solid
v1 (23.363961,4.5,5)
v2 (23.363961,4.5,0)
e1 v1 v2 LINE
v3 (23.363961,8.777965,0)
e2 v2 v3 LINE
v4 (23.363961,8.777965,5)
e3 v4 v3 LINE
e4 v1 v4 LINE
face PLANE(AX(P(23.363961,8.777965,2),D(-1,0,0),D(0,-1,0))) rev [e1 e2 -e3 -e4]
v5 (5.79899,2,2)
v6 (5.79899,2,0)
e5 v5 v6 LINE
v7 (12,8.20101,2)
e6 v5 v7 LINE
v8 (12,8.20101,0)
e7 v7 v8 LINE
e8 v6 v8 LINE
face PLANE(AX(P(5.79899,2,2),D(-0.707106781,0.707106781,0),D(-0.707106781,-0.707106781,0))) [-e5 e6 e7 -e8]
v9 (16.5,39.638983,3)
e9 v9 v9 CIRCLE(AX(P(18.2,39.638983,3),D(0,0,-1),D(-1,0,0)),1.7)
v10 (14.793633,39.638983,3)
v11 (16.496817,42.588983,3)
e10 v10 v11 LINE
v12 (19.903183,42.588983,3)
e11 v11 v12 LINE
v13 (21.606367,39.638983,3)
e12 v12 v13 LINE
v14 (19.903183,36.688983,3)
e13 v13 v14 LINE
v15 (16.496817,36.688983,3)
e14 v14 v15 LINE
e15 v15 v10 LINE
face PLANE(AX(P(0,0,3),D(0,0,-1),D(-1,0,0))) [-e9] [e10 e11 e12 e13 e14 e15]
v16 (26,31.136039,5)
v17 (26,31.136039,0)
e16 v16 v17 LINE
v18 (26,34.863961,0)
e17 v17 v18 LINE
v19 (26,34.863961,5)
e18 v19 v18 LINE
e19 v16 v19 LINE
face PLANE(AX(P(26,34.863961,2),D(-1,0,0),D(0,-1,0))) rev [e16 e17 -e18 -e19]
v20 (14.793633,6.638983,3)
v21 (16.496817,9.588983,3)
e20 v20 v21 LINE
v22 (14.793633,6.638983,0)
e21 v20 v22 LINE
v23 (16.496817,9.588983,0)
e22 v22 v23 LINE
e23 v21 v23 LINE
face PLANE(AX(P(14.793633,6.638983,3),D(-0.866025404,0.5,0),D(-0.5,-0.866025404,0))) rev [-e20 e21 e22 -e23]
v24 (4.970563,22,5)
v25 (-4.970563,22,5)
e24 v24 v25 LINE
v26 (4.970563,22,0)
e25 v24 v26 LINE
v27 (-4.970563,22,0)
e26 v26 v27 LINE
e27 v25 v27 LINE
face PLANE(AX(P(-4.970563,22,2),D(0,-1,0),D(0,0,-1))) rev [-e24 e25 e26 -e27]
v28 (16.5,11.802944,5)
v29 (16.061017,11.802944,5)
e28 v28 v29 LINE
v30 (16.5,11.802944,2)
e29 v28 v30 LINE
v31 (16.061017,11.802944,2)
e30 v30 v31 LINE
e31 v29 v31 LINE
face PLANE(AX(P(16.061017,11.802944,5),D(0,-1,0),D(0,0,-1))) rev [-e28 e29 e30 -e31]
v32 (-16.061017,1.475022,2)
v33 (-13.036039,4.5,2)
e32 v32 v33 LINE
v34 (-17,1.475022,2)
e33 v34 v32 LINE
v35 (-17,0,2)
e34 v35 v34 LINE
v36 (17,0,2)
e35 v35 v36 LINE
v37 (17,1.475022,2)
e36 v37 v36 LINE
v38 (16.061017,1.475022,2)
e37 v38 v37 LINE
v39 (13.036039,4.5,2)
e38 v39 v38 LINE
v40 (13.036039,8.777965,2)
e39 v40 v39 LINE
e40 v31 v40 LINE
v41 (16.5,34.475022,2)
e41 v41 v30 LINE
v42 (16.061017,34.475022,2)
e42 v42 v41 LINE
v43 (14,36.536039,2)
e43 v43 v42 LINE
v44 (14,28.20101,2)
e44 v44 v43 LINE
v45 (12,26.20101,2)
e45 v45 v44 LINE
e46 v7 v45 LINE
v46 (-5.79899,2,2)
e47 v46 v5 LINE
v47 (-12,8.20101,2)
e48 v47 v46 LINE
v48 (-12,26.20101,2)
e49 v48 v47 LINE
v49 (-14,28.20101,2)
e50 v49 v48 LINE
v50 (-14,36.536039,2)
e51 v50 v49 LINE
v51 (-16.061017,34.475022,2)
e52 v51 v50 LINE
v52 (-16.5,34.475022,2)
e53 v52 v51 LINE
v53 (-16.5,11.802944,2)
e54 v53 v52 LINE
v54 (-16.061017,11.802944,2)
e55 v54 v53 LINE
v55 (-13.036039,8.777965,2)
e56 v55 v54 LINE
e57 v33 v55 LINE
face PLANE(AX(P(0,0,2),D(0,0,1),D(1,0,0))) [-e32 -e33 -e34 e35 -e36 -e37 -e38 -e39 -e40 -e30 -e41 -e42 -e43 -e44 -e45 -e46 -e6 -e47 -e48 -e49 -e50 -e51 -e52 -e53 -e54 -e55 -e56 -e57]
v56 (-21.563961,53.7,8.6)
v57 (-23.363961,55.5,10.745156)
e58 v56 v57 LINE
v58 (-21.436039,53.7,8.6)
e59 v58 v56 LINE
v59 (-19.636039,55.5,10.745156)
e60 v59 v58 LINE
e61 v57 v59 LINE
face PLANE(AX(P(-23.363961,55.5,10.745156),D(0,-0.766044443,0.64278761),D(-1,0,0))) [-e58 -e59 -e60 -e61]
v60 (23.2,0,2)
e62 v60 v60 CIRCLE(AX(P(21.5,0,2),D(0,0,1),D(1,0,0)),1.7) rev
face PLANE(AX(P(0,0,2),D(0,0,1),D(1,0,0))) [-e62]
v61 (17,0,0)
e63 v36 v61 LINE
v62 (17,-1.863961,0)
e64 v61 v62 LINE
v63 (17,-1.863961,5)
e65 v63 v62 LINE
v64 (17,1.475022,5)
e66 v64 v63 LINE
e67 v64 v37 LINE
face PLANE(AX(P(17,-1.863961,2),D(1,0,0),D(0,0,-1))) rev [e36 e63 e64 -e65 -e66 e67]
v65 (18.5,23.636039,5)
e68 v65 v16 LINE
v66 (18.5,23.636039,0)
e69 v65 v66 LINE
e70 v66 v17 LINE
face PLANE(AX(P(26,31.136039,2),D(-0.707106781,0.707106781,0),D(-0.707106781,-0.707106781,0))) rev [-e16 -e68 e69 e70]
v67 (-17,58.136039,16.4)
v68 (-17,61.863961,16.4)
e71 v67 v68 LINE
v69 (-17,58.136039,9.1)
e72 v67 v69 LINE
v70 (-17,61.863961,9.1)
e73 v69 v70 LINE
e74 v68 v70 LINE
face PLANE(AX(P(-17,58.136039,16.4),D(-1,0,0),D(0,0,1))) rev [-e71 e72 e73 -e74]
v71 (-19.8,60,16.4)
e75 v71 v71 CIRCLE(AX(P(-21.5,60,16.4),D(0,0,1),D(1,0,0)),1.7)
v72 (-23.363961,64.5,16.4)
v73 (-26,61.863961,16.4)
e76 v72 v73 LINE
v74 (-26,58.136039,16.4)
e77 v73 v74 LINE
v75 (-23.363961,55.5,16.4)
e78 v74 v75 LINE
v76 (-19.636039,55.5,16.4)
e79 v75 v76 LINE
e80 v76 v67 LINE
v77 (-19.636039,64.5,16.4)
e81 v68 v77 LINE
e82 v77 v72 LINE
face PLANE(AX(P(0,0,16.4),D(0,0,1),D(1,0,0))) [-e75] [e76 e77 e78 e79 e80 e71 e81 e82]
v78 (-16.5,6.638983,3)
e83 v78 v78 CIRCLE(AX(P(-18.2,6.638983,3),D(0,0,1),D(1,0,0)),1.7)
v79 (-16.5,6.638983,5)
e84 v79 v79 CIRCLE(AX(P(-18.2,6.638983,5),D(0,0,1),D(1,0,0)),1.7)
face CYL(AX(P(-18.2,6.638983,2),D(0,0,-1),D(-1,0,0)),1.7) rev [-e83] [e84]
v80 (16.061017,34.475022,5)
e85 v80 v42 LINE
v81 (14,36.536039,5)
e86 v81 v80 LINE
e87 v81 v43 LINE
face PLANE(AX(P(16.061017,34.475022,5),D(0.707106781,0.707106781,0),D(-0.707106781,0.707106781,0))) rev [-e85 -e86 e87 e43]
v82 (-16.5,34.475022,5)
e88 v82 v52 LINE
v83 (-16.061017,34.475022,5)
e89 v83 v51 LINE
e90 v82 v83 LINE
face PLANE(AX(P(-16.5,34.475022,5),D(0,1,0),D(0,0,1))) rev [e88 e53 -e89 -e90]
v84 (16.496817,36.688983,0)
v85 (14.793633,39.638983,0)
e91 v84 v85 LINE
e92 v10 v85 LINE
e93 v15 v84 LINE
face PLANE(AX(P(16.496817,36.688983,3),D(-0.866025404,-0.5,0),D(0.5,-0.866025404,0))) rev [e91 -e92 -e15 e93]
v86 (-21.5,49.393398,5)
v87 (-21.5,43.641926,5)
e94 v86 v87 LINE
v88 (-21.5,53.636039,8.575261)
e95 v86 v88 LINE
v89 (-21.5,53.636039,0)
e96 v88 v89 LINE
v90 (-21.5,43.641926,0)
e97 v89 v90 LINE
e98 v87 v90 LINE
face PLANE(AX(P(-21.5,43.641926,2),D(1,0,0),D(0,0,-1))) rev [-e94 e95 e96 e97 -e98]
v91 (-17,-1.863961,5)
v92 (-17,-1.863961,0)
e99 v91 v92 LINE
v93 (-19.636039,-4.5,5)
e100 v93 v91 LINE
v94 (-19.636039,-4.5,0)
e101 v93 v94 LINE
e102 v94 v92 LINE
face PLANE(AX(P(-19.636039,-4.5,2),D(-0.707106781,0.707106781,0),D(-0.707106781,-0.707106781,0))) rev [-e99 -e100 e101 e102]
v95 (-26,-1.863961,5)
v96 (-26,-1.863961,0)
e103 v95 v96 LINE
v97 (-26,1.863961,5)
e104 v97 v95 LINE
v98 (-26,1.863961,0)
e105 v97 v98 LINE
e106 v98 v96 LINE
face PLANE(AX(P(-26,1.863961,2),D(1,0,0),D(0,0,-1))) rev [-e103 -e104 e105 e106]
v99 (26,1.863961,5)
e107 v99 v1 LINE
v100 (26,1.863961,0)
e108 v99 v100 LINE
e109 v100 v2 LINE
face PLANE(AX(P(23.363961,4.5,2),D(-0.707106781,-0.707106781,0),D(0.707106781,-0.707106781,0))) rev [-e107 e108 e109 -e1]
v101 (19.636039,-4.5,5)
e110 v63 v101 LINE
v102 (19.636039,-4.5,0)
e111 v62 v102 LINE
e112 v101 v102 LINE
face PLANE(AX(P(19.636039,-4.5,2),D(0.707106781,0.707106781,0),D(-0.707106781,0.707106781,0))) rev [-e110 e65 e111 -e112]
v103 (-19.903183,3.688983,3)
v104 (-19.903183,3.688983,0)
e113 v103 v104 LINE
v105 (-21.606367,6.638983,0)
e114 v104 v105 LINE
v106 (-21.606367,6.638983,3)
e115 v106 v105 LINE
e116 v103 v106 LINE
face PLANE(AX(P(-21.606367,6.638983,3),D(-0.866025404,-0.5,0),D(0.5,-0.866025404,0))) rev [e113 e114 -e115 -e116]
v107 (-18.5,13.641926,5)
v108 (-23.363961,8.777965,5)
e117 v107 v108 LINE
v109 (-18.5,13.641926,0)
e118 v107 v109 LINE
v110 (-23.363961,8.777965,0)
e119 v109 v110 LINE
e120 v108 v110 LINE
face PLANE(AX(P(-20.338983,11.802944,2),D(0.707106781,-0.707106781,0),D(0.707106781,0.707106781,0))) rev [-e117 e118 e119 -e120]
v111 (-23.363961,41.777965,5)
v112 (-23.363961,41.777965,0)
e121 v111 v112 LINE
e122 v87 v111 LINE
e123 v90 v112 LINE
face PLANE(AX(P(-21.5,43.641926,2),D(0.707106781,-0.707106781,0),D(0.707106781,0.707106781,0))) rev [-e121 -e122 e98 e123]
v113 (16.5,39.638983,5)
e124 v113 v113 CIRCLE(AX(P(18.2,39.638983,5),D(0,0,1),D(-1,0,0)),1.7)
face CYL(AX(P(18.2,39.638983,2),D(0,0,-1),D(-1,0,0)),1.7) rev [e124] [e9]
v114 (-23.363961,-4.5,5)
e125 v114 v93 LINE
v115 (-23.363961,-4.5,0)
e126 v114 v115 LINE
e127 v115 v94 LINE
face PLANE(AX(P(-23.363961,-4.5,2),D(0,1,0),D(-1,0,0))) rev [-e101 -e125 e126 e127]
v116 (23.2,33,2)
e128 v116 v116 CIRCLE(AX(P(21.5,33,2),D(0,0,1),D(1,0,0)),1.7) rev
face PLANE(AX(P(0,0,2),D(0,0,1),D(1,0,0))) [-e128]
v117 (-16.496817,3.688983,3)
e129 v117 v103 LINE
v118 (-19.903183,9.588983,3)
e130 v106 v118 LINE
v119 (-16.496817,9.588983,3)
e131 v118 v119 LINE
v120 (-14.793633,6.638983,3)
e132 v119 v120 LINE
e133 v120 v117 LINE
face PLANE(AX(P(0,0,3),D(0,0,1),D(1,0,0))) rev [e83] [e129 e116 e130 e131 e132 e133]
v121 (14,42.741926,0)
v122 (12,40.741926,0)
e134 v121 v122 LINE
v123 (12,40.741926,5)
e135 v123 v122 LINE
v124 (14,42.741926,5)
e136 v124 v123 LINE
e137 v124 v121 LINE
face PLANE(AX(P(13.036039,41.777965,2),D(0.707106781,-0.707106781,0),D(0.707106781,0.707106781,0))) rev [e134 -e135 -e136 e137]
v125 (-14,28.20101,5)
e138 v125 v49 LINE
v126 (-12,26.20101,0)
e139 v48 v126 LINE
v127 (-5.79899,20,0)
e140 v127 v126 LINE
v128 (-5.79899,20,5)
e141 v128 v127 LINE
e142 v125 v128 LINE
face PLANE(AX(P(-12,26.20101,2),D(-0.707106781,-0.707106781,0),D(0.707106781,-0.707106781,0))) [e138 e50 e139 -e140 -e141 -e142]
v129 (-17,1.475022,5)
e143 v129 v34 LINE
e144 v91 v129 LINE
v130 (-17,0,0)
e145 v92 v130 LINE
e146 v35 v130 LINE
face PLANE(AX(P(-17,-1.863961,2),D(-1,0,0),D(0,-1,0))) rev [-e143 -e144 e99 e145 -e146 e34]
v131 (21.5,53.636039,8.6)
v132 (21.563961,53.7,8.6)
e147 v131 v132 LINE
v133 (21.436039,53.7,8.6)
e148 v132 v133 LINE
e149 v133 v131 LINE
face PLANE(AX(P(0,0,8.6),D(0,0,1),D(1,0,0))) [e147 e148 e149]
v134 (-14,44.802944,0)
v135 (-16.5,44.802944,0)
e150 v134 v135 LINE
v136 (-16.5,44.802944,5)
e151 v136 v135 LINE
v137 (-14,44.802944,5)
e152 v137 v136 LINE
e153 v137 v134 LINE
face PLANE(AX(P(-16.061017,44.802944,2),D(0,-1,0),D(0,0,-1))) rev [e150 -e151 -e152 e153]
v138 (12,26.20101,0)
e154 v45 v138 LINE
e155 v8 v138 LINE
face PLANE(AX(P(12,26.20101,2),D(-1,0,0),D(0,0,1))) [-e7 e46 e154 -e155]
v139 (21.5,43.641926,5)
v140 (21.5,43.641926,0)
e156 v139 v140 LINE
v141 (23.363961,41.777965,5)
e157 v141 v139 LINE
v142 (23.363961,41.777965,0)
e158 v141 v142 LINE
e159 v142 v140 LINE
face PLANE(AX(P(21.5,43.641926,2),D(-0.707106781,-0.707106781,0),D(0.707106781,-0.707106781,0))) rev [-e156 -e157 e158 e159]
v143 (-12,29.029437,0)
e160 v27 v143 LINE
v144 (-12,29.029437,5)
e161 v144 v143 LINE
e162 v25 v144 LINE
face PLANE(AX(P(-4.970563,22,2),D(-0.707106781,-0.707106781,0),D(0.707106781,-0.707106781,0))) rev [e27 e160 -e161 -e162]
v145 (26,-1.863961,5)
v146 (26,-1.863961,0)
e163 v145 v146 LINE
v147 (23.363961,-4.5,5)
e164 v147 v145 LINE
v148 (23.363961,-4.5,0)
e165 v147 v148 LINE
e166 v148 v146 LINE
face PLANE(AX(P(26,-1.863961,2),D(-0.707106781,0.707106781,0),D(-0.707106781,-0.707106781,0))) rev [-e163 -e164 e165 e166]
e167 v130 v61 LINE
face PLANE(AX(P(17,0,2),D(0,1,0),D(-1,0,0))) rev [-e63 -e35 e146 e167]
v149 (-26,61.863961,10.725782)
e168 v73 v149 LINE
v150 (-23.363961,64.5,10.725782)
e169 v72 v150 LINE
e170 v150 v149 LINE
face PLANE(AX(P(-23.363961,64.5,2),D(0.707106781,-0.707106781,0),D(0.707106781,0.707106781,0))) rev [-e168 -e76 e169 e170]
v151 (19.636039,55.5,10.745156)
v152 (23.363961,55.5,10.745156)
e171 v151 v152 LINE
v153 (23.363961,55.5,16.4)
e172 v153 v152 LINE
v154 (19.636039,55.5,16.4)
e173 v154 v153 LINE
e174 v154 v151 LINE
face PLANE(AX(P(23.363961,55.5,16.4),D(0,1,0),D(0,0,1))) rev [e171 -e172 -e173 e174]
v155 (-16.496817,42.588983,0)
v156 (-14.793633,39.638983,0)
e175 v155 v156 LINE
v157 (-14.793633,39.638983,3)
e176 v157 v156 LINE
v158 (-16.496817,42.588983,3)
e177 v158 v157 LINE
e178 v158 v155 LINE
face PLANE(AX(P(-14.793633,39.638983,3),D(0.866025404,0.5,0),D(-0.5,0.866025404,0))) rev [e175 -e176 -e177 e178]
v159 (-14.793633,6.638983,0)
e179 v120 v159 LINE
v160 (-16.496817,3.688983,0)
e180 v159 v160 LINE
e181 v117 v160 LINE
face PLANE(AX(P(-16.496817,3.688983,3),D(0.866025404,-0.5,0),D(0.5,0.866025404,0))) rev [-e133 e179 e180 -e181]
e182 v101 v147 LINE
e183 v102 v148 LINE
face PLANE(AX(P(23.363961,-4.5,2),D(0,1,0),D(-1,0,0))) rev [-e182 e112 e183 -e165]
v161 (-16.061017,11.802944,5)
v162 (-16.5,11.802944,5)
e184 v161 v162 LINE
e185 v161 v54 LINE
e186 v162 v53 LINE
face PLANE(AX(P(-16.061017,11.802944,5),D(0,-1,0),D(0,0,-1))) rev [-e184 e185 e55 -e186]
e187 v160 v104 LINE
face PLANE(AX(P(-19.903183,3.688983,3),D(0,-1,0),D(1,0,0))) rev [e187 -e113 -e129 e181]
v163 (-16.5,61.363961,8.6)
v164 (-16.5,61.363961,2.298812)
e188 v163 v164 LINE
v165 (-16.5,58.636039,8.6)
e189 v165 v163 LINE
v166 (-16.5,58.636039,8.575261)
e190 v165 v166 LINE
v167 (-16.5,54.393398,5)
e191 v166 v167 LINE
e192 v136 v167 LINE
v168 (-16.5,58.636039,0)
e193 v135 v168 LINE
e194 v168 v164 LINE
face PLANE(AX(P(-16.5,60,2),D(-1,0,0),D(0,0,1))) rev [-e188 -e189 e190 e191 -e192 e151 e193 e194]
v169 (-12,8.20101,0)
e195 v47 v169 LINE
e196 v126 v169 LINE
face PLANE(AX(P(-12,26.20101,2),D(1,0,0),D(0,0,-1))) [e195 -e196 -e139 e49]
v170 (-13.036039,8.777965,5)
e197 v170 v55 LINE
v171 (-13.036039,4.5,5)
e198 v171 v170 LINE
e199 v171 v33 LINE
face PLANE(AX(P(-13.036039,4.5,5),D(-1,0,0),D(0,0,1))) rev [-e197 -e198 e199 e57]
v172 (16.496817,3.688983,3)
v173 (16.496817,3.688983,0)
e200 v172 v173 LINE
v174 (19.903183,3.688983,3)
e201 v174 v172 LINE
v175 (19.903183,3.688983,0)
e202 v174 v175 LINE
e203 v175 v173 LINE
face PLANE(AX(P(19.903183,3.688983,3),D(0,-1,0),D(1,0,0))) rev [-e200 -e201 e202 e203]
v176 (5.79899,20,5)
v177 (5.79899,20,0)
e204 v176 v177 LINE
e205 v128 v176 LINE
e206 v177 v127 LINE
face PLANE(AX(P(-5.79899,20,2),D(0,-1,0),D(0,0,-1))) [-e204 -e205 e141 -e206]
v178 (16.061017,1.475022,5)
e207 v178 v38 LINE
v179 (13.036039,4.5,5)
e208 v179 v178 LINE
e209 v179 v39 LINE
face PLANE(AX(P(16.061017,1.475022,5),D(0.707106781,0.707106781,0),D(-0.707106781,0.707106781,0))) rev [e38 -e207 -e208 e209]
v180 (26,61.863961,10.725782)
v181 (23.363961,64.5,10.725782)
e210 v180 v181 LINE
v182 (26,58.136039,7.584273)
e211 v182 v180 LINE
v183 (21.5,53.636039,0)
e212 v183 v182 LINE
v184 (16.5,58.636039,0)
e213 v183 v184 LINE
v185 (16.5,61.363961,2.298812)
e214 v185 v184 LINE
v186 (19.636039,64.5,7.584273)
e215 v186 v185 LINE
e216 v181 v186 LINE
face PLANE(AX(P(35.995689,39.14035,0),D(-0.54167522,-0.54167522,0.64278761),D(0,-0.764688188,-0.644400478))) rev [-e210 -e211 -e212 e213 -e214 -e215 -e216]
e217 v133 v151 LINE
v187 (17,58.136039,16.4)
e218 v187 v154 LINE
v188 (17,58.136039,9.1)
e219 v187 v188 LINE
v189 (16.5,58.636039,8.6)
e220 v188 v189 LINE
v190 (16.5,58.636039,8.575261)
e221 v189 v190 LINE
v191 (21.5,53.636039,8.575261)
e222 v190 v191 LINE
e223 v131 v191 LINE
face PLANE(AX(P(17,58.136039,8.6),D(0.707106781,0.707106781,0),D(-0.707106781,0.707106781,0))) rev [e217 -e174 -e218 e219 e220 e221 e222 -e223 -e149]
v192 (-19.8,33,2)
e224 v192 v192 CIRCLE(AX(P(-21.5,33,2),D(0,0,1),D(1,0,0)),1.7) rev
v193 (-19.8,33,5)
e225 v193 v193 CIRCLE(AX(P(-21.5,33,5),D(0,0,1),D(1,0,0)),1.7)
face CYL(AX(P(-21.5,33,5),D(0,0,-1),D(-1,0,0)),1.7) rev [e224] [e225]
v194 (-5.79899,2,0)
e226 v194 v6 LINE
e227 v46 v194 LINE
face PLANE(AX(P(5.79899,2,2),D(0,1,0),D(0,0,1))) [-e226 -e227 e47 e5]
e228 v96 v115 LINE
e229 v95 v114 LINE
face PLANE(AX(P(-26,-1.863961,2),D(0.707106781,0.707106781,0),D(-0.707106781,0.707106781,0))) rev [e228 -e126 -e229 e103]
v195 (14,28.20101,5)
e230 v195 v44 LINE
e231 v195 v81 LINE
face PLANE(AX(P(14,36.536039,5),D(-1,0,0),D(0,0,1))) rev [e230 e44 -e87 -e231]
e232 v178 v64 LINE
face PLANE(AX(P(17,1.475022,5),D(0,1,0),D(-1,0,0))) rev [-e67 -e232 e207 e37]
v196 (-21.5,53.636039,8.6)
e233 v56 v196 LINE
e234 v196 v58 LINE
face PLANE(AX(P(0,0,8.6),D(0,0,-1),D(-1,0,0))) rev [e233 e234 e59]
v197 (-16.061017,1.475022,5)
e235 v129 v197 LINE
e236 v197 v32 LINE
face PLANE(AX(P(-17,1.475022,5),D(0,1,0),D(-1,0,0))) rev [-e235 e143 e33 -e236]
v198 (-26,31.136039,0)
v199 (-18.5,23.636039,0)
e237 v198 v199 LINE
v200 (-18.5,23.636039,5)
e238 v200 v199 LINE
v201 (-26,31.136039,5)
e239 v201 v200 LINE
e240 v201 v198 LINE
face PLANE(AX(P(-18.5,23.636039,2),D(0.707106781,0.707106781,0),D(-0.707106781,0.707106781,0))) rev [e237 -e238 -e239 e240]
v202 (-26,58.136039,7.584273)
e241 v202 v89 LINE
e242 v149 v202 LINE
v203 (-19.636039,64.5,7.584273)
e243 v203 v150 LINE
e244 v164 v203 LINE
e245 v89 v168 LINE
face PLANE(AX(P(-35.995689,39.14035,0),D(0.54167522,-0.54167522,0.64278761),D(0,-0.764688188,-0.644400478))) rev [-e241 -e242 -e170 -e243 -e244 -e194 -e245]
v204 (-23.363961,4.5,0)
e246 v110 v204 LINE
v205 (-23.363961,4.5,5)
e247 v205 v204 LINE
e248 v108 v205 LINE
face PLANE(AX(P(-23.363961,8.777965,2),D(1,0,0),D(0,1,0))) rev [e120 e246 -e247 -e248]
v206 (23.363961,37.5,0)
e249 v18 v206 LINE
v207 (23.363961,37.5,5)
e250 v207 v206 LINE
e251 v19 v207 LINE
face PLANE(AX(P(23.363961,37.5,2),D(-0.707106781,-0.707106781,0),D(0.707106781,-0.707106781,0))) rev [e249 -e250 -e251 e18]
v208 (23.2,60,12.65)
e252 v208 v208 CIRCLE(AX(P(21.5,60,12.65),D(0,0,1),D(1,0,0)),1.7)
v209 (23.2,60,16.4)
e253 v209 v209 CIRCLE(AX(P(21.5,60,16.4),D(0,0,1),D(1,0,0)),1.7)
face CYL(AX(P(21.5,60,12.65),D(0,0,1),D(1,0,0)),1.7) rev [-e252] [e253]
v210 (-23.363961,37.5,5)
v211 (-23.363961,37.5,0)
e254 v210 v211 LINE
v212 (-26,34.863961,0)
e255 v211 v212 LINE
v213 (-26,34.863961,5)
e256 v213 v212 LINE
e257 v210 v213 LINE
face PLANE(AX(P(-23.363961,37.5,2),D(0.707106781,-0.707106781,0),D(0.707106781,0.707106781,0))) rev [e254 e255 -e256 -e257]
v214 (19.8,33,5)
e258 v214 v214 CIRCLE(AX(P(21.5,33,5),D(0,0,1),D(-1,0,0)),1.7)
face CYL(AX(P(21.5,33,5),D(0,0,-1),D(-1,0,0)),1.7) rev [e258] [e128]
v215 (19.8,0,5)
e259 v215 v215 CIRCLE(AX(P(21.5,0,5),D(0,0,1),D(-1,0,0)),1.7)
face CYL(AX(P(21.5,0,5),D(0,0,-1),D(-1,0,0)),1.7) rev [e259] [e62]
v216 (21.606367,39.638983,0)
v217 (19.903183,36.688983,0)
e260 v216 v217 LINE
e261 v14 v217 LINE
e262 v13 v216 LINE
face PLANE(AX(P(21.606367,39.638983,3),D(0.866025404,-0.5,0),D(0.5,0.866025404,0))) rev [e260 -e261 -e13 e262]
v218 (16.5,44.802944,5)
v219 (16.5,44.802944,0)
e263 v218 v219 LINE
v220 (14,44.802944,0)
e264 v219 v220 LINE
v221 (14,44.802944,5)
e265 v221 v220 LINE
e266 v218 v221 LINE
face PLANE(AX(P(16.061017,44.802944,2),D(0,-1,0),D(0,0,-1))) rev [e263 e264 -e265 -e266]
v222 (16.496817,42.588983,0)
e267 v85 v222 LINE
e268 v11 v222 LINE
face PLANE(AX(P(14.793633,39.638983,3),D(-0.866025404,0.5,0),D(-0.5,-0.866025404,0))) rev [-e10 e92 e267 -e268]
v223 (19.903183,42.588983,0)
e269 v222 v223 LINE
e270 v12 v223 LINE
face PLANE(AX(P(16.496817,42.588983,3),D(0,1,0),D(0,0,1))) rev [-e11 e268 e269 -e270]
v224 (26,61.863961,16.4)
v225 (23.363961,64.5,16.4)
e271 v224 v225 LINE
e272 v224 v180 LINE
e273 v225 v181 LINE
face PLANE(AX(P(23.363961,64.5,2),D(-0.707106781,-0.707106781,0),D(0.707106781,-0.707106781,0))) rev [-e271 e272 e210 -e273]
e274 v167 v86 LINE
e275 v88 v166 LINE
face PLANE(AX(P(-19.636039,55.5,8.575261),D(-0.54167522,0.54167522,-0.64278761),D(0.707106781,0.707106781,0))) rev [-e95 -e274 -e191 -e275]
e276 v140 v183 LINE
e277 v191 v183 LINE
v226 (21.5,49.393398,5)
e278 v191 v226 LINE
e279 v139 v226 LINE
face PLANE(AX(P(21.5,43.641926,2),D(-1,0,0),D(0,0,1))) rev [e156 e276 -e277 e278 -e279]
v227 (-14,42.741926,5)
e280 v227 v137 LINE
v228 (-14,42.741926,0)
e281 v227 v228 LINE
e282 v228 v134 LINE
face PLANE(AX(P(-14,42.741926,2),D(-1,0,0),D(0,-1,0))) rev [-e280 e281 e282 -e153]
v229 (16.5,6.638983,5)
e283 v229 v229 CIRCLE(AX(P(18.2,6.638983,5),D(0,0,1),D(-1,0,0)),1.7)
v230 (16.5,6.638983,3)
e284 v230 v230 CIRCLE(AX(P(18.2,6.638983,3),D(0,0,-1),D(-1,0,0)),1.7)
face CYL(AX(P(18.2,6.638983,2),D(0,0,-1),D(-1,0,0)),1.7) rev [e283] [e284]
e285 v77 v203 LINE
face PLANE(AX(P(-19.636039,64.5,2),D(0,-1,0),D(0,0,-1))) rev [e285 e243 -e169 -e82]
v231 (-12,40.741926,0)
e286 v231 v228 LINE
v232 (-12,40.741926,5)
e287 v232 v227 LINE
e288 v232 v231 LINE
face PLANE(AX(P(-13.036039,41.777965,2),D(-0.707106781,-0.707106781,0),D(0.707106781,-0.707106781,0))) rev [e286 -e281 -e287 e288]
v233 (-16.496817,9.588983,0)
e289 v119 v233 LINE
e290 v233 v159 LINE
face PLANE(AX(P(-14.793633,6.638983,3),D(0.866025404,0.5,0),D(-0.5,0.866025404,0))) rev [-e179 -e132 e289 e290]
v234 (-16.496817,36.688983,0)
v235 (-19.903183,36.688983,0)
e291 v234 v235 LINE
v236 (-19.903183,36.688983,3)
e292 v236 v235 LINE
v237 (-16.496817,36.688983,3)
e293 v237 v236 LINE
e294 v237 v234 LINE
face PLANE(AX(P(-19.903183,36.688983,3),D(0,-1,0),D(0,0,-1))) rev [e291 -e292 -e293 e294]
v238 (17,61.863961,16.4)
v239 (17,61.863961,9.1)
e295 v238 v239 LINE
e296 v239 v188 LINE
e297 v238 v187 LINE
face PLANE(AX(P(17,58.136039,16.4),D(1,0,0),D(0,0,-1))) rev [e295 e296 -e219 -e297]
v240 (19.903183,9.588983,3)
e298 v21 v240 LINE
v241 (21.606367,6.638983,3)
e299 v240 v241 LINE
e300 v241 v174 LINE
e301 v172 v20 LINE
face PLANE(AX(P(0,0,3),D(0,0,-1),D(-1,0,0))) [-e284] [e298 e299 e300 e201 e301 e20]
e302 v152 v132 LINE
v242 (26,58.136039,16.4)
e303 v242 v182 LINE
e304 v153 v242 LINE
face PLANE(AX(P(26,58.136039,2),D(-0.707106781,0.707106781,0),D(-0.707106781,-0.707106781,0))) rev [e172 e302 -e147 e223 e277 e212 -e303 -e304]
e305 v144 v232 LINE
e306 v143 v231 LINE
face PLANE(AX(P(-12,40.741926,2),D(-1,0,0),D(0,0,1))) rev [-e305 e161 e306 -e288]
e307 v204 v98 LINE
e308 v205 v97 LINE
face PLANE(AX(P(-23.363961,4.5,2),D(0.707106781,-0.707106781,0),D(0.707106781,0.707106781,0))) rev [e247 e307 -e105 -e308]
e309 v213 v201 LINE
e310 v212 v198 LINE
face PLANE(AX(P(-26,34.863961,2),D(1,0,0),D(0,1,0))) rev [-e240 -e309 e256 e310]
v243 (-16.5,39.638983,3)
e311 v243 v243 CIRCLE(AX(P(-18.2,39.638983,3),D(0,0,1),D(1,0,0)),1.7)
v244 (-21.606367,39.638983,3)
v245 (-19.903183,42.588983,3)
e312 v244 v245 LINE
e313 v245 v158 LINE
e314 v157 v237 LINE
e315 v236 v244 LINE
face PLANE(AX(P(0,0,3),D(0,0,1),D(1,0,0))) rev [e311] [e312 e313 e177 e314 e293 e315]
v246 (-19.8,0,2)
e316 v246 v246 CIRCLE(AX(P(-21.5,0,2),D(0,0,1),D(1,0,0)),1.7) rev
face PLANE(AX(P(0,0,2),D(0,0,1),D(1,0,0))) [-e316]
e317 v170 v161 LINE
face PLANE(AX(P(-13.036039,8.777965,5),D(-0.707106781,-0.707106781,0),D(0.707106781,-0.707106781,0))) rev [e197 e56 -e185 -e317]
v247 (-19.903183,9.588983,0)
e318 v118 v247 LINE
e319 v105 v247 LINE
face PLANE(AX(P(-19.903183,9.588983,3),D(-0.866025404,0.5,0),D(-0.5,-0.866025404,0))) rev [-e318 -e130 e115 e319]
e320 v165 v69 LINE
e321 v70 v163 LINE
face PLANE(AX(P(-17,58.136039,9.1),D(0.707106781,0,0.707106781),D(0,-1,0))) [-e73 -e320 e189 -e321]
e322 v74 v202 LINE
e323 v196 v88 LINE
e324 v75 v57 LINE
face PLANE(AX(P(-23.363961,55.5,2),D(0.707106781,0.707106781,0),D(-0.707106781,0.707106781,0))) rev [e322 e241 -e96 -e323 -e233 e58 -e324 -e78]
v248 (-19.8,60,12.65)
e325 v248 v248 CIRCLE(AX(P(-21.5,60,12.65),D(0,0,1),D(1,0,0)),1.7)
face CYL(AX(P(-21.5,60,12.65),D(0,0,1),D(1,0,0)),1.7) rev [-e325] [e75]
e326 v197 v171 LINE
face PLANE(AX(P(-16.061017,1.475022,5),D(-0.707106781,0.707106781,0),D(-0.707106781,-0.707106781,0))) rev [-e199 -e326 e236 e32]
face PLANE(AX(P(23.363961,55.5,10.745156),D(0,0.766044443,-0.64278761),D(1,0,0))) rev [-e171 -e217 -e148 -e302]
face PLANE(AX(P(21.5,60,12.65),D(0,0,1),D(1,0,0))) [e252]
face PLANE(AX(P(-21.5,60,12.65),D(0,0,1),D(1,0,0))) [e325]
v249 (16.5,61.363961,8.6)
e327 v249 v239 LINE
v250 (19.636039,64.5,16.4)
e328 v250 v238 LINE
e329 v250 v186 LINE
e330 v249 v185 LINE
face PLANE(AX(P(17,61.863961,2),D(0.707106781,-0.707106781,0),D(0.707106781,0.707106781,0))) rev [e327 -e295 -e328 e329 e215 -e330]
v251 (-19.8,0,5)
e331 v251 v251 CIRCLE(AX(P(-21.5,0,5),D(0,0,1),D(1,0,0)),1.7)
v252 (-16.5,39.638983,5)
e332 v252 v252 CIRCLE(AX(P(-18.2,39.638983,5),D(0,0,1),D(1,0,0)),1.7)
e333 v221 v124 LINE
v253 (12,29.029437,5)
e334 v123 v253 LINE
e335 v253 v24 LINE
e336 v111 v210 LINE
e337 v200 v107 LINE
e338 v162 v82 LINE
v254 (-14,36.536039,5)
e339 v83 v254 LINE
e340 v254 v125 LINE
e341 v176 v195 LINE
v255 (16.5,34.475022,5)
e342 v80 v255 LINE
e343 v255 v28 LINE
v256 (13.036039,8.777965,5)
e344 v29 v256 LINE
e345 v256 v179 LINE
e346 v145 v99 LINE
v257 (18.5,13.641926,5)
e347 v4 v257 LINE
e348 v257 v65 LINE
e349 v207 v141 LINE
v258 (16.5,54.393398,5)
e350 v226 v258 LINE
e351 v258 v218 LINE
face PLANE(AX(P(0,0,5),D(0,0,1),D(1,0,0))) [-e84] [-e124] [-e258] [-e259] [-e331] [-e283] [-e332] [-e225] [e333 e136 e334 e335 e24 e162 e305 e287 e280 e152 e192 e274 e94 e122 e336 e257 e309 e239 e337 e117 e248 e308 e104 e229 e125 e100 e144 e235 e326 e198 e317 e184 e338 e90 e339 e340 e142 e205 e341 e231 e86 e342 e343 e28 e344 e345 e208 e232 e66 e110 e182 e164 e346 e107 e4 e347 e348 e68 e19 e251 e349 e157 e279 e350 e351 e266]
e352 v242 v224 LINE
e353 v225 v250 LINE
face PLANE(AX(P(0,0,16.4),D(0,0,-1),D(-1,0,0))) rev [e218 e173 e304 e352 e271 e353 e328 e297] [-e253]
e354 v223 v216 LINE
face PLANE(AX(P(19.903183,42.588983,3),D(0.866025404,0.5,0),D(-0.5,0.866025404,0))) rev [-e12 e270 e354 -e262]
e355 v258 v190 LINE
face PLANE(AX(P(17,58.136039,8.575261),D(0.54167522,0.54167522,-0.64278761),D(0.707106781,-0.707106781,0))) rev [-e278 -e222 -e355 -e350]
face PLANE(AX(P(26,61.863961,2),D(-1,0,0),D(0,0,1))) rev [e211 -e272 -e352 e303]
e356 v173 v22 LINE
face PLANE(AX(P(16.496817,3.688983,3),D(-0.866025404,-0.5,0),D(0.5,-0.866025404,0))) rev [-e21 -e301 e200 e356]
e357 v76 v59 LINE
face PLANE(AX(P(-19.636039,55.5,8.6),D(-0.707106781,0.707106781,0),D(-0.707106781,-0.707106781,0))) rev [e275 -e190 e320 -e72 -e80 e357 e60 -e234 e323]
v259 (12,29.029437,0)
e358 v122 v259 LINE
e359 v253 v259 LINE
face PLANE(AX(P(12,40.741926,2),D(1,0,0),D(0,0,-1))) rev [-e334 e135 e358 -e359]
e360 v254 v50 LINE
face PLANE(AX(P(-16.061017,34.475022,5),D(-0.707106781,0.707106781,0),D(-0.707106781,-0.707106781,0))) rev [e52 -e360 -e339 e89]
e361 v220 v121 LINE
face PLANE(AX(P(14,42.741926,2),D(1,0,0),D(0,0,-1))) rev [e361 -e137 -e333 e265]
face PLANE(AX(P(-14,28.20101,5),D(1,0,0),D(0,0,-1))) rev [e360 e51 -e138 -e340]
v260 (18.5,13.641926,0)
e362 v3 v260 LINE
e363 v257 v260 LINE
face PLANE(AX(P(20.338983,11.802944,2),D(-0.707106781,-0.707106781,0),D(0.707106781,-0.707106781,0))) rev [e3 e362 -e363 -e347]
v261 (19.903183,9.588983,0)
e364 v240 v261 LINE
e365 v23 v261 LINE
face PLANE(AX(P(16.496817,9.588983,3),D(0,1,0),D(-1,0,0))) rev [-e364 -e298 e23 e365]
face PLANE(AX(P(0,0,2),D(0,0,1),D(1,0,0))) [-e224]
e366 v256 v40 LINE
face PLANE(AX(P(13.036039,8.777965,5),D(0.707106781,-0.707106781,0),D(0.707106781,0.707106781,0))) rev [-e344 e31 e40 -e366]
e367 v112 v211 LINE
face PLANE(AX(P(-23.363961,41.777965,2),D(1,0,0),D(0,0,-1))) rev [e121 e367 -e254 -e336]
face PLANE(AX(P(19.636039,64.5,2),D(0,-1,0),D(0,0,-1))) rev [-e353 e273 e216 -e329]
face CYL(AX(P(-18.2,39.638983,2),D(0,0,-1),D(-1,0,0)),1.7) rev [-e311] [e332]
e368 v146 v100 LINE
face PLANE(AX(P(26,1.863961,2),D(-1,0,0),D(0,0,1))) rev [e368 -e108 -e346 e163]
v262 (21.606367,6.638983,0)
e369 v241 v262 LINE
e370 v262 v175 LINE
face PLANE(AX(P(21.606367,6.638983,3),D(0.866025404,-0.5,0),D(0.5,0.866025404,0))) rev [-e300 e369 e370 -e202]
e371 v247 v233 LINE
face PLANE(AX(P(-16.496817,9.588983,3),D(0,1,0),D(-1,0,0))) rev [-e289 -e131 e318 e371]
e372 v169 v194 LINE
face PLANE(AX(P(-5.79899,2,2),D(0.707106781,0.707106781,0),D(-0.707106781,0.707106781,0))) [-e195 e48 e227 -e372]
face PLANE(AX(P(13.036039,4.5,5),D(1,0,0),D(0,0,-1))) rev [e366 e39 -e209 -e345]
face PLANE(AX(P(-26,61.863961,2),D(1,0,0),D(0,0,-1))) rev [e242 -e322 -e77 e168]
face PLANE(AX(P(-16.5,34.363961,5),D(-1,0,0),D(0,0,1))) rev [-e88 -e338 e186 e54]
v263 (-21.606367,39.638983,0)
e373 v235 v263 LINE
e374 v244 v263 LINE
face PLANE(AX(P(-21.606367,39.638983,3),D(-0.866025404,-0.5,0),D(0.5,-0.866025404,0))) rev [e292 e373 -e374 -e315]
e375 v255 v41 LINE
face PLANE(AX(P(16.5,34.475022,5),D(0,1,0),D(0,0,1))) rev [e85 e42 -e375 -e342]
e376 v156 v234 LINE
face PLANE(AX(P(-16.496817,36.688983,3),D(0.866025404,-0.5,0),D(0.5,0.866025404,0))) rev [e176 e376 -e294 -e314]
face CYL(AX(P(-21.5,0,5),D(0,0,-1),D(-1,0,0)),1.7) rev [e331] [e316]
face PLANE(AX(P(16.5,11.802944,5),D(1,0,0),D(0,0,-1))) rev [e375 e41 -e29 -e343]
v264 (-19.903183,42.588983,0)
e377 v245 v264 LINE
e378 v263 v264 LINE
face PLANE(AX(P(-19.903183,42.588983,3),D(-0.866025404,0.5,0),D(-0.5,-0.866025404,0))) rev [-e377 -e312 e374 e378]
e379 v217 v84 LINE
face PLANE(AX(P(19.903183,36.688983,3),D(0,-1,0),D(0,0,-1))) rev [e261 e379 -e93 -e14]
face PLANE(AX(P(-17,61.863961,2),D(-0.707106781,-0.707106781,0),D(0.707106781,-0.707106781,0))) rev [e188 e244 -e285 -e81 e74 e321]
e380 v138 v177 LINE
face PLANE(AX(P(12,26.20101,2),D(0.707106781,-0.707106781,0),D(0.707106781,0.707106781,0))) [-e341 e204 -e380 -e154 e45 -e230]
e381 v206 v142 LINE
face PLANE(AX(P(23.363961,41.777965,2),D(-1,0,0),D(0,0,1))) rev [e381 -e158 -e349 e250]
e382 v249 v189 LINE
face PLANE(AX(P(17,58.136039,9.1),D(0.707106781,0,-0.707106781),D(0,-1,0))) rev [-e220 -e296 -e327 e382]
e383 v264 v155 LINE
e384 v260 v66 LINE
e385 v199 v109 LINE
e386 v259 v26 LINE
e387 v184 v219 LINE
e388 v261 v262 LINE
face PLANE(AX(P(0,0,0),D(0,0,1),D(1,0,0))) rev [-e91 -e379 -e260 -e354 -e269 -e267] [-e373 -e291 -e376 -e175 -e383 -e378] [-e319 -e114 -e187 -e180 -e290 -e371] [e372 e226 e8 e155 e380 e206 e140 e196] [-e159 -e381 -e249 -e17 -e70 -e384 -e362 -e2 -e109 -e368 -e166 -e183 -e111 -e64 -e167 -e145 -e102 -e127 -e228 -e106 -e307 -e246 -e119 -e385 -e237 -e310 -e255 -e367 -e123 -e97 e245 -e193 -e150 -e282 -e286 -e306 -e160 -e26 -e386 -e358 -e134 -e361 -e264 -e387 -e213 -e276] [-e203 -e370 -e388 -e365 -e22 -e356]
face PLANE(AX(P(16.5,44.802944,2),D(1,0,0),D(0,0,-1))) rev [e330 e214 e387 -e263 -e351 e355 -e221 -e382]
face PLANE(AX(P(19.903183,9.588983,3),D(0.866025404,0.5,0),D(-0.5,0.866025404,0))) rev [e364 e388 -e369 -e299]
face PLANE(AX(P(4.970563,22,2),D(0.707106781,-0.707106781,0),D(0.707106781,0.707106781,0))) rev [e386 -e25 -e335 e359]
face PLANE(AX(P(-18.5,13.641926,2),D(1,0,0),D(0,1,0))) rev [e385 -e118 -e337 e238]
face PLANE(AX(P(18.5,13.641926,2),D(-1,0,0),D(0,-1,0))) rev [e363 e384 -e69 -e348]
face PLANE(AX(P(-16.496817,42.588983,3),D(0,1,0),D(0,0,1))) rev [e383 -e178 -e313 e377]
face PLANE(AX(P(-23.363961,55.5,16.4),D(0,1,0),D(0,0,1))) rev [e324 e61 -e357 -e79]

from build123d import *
from OCP.BRepFilletAPI import BRepFilletAPI_MakeChamfer

# Parameters (mm, degrees)
SKETCH5_R           = 1.7
BOSS_EXTRUDE1_DEPTH = 2
SKETCH9_R           = 1.7
BOSS_EXTRUDE3_DEPTH = 3
BOSS_EXTRUDE4_DEPTH = 3.6
BOSS_EXTRUDE5_DEPTH = 7.8
TOP_ANGLE_1_DEPTH   = 25
TOP_ANGLE_2_DEPTH   = 25
CHAMFER1_SIZE       = 3
CHAMFER1_SIZE_2     = 3.575260778
CHAMFER2_SIZE       = 1.8
CHAMFER2_SIZE2      = 2.145156467
SKETCH19_R          = 1.7
CUT_EXTRUDE1_DEPTH  = 3.75
M3_HEAD_HOLES_DEPTH = 3
CHAMFER3_SIZE       = 0.5


# Some blends are built 0.0001 mm under size
with BuildPart() as part:
    # Sketch5 → Boss-Extrude1 (new body)
    with BuildSketch(Plane.XY):
        Polygon((16.5, 44.802943725), (16.5, 45.24192642), (16.5, 61.363961031), (17, 61.863961031), (19.636038969, 64.5), (23.363961031, 64.5), (26, 61.863961031), (26, 58.136038969), (23.363961031, 55.5), (21.5, 53.636038969), (21.5, 43.64192642), (23.363961031, 41.777965389), (23.363961031, 37.5), (26, 34.863961031), (26, 31.136038969), (23.363961031, 28.5), (18.5, 23.636038969), (18.5, 13.64192642), (20.338982694, 11.802943725), (23.363961031, 8.777965389), (23.363961031, 4.5), (26, 1.863961031), (26, -1.863961031), (23.363961031, -4.5), (19.636038969, -4.5), (17, -1.863961031), (17, 0), (-17, 0), (-17, -1.863961031), (-19.636038969, -4.5), (-23.363961031, -4.5), (-26, -1.863961031), (-26, 1.863961031), (-23.363961031, 4.5), (-23.363961031, 8.777965389), (-20.338982694, 11.802943725), (-18.5, 13.64192642), (-18.5, 23.636038969), (-23.363961031, 28.5), (-26, 31.136038969), (-26, 34.863961031), (-23.363961031, 37.5), (-23.363961031, 41.777965389), (-21.5, 43.64192642), (-21.5, 53.636038969), (-23.363961031, 55.5), (-26, 58.136038969), (-26, 61.863961031), (-23.363961031, 64.5), (-19.636038969, 64.5), (-17, 61.863961031), (-16.5, 61.363961031), (-16.5, 60), (-16.5, 44.802943725), (-16.061017306, 44.802943725), (-14, 44.802943725), (-14, 42.74192642), (-13.036038969, 41.777965389), (-12, 40.74192642), (-12, 29.029437252), (-4.970562748, 22), (4.970562748, 22), (12, 29.029437252), (12, 40.74192642), (13.036038969, 41.777965389), (14, 42.74192642), (14, 44.802943725), (16.061017306, 44.802943725), align=None)
        with Locations((-18.2, 6.638982694)):
            Circle(SKETCH5_R, mode=Mode.SUBTRACT)
        with Locations((-18.2, 39.638982694)):
            Circle(SKETCH5_R, mode=Mode.SUBTRACT)
        with Locations(Location((18.2, 39.638982694, 0), (0, 0, 180))):
            Circle(SKETCH5_R, mode=Mode.SUBTRACT)
        with Locations(Location((18.2, 6.638982694, 0), (0, 0, 180))):
            Circle(SKETCH5_R, mode=Mode.SUBTRACT)
        Polygon((5.798989873, 2), (-5.798989873, 2), (-12, 8.201010127), (-12, 26.201010127), (-5.798989873, 20), (5.798989873, 20), (12, 26.201010127), (12, 8.201010127), align=None, mode=Mode.SUBTRACT)
    extrude(amount=BOSS_EXTRUDE1_DEPTH)

    # Sketch9 → Boss-Extrude3 (add)
    with BuildSketch(Plane.XY.offset(2)):
        Polygon((-19.636038969, -4.5), (-17, -1.863961031), (-17, 1.475021664), (-16.061017306, 1.475021664), (-13.036038969, 4.5), (-13.036038969, 8.777965389), (-16.061017306, 11.802943725), (-16.5, 11.802943725), (-16.5, 34.363961031), (-16.5, 34.475021664), (-16.061017306, 34.475021664), (-14, 36.536038969), (-14, 28.201010127), (-12, 26.201010127), (-5.798989873, 20), (5.798989873, 20), (12, 26.201010127), (14, 28.201010127), (14, 36.536038969), (16.061017306, 34.475021664), (16.5, 34.475021664), (16.5, 34.363961031), (16.5, 11.802943725), (16.061017306, 11.802943725), (13.036038969, 8.777965389), (13.036038969, 4.5), (16.061017306, 1.475021664), (17, 1.475021664), (17, -1.863961031), (19.636038969, -4.5), (23.363961031, -4.5), (26, -1.863961031), (26, 1.863961031), (23.363961031, 4.5), (23.363961031, 8.777965389), (20.338982694, 11.802943725), (18.5, 13.64192642), (18.5, 23.636038969), (23.363961031, 28.5), (26, 31.136038969), (26, 34.863961031), (23.363961031, 37.5), (23.363961031, 41.777965389), (21.5, 43.64192642), (21.5, 53.636038969), (23.363961031, 55.5), (26, 58.136038969), (26, 61.863961031), (23.363961031, 64.5), (19.636038969, 64.5), (17, 61.863961031), (16.5, 61.363961031), (16.5, 45.24192642), (16.5, 44.802943725), (16.061017306, 44.802943725), (14, 44.802943725), (14, 42.74192642), (13.036038969, 41.777965389), (12, 40.74192642), (12, 29.029437252), (4.970562748, 22), (-4.970562748, 22), (-12, 29.029437252), (-12, 40.74192642), (-13.036038969, 41.777965389), (-14, 42.74192642), (-14, 44.802943725), (-16.061017306, 44.802943725), (-16.5, 44.802943725), (-16.5, 60), (-16.5, 61.363961031), (-17, 61.863961031), (-19.636038969, 64.5), (-23.363961031, 64.5), (-26, 61.863961031), (-26, 58.136038969), (-23.363961031, 55.5), (-21.5, 53.636038969), (-21.5, 43.64192642), (-23.363961031, 41.777965389), (-23.363961031, 37.5), (-26, 34.863961031), (-26, 31.136038969), (-23.363961031, 28.5), (-18.5, 23.636038969), (-18.5, 13.64192642), (-20.338982694, 11.802943725), (-23.363961031, 8.777965389), (-23.363961031, 4.5), (-26, 1.863961031), (-26, -1.863961031), (-23.363961031, -4.5), align=None)
        with Locations((-21.5, 33)):
            Circle(SKETCH9_R, mode=Mode.SUBTRACT)
        with Locations((-18.2, 39.638982694)):
            Circle(SKETCH9_R, mode=Mode.SUBTRACT)
        with Locations((-21.5, 0)):
            Circle(SKETCH9_R, mode=Mode.SUBTRACT)
        with Locations((-18.2, 6.638982694)):
            Circle(SKETCH9_R, mode=Mode.SUBTRACT)
        with Locations(Location((18.2, 6.638982694, 0), (0, 0, 180))):
            Circle(SKETCH9_R, mode=Mode.SUBTRACT)
        with Locations(Location((21.5, 0, 0), (0, 0, 180))):
            Circle(SKETCH9_R, mode=Mode.SUBTRACT)
        with Locations(Location((18.2, 39.638982694, 0), (0, 0, 180))):
            Circle(SKETCH9_R, mode=Mode.SUBTRACT)
        with Locations(Location((21.5, 33, 0), (0, 0, 180))):
            Circle(SKETCH9_R, mode=Mode.SUBTRACT)
    extrude(amount=BOSS_EXTRUDE3_DEPTH)

    # Sketch10 → Boss-Extrude4 (add)
    with BuildSketch(Plane.XY.offset(5)):
        Polygon((17, 58.136038969), (16.5, 58.636038969), (16.5, 61.363961031), (17, 61.863961031), (19.636038969, 64.5), (23.363961031, 64.5), (26, 61.863961031), (26, 58.136038969), (23.363961031, 55.5), (21.5, 53.636038969), (19.636038969, 55.5), align=None)
        Polygon((-17, 61.863961031), (-19.636038969, 64.5), (-23.363961031, 64.5), (-26, 61.863961031), (-26, 58.136038969), (-23.363961031, 55.5), (-21.5, 53.636038969), (-19.636038969, 55.5), (-17, 58.136038969), (-16.5, 58.636038969), (-16.5, 61.363961031), align=None)
    extrude(amount=BOSS_EXTRUDE4_DEPTH)

    # Sketch20 → Boss-Extrude5 (add)
    with BuildSketch(Plane.XY.offset(8.6)):
        Polygon((-17, 58.136038969), (-17, 61.863961031), (-19.636038969, 64.5), (-23.363961031, 64.5), (-26, 61.863961031), (-26, 58.136038969), (-23.363961031, 55.5), (-19.636038969, 55.5), align=None)
        Polygon((17, 61.863961031), (19.636038969, 64.5), (23.363961031, 64.5), (26, 61.863961031), (26, 58.136038969), (23.363961031, 55.5), (19.636038969, 55.5), (17, 58.136038969), align=None)
    extrude(amount=BOSS_EXTRUDE5_DEPTH)

    # Sketch15 → Top Angle 1 (cut, symmetric)
    with BuildSketch(Plane(origin=(19.25, 19.25, 0), x_dir=(0, 0, -1), z_dir=(0.7071067811865485, 0.7071067811865467, 0))):
        Polygon((0, 53.129202667), (-15.320888862, 65.98495486), (-8.893012766, 73.645399292), (6.427876097, 60.789647098), align=None)
    extrude(amount=TOP_ANGLE_1_DEPTH, both=True, mode=Mode.SUBTRACT)

    # Sketch16 → Top Angle 2 (cut, symmetric)
    with BuildSketch(Plane(origin=(-19.25, 19.25, 0), x_dir=(0.7071067811865475, 0.7071067811865477, 0), z_dir=(-0.7071067811865477, 0.7071067811865475, 0))):
        Polygon((53.129202667, 0), (65.98495486, -15.320888862), (73.645399292, -8.893012766), (60.789647098, 6.427876097), align=None)
    extrude(amount=TOP_ANGLE_2_DEPTH, both=True, mode=Mode.SUBTRACT)

    # Chamfer1
    # the kernel refuses this chamfer: 3.575260778, 3 mm, written as the material it adds along each edge
    with BuildSketch(Plane(origin=(-28.015917535, 47.120121434, 5), x_dir=(0.7066633444206492, -0.7066633444206532, -0.03540953691366292), z_dir=(0.7071067811865496, 0.7071067811865456, 0))) as chamfer1_piece_1_section:
        Polygon((CHAMFER1_SIZE * 0.999372885712, -CHAMFER1_SIZE * 0.0354095369137), (-CHAMFER1_SIZE_2 * 0.0354095369115, -CHAMFER1_SIZE_2 * 0.999372885651), (0, 0), align=None)
    chamfer1_piece_1 = extrude(amount=25.500865711, mode=Mode.PRIVATE)
    chamfer1_piece_1 = split(chamfer1_piece_1, bisect_by=Plane(origin=(-21.5, 51.974230038, 5.812222145), z_dir=(1, 0, 0)), keep=Keep.TOP, mode=Mode.PRIVATE)
    chamfer1_piece_1 = split(chamfer1_piece_1, bisect_by=Plane(origin=(-20.392127379, 52.528166349, 5.812222145), z_dir=(-0.7071067811865449, -0.7071067811865502, 0)), keep=Keep.TOP, mode=Mode.PRIVATE)
    add(chamfer1_piece_1)
    with BuildSketch(Plane(origin=(-21.5, 53.636038969, 5), x_dir=(0.7066633444206492, -0.7066633444206532, -0.03540953691366292), z_dir=(0.7071067811865496, 0.7071067811865456, 0))) as chamfer1_piece_2_section:
        Polygon((CHAMFER1_SIZE * 0.999372885712, -CHAMFER1_SIZE * 0.0354095369137), (-CHAMFER1_SIZE_2 * 0.0354095369115, -CHAMFER1_SIZE_2 * 0.999372885651), (0, 0), align=None)
    chamfer1_piece_2 = extrude(amount=16.285966762, mode=Mode.PRIVATE)
    chamfer1_piece_2 = split(chamfer1_piece_2, bisect_by=Plane(origin=(-21.5, 55.195385709, 6.244922793), z_dir=(1, 0, 0)), keep=Keep.TOP, mode=Mode.PRIVATE)
    chamfer1_piece_2 = split(chamfer1_piece_2, bisect_by=Plane(origin=(-16.5, 55.195385709, 6.244922793), z_dir=(-1, 0, 0)), keep=Keep.TOP, mode=Mode.PRIVATE)
    add(chamfer1_piece_2)
    with BuildSketch(Plane(origin=(9.984082465, 65.151956505, 5), x_dir=(0.017634763768199533, 0.01763476376819963, 0.9996889667359942), z_dir=(0.7071067811865496, -0.7071067811865456, 0))) as chamfer1_piece_3_section:
        Polygon((CHAMFER1_SIZE_2 * 0.999688966675, CHAMFER1_SIZE_2 * 0.0249393220887), (-CHAMFER1_SIZE * 0.0249393220902, CHAMFER1_SIZE * 0.999688966736), (0, 0), align=None)
    chamfer1_piece_3 = extrude(amount=16.285966762, mode=Mode.PRIVATE)
    chamfer1_piece_3 = split(chamfer1_piece_3, bisect_by=Plane(origin=(16.5, 55.195385709, 6.244922793), z_dir=(1, 0, 0)), keep=Keep.TOP, mode=Mode.PRIVATE)
    chamfer1_piece_3 = split(chamfer1_piece_3, bisect_by=Plane(origin=(21.5, 55.195385709, 6.244922793), z_dir=(-1, 0, 0)), keep=Keep.TOP, mode=Mode.PRIVATE)
    add(chamfer1_piece_3)
    with BuildSketch(Plane(origin=(9.984082465, 65.151956505, 5), x_dir=(0.017634763768199533, 0.01763476376819963, 0.9996889667359942), z_dir=(0.7071067811865496, -0.7071067811865456, 0))) as chamfer1_piece_4_section:
        Polygon((CHAMFER1_SIZE_2 * 0.999688966675, CHAMFER1_SIZE_2 * 0.0249393220887), (-CHAMFER1_SIZE * 0.0249393220902, CHAMFER1_SIZE * 0.999688966736), (0, 0), align=None)
    chamfer1_piece_4 = extrude(amount=25.500865711, mode=Mode.PRIVATE)
    chamfer1_piece_4 = split(chamfer1_piece_4, bisect_by=Plane(origin=(20.392127379, 52.528166349, 5.812222145), z_dir=(0.707106781186548, -0.707106781186547, 0)), keep=Keep.TOP, mode=Mode.PRIVATE)
    chamfer1_piece_4 = split(chamfer1_piece_4, bisect_by=Plane(origin=(21.5, 51.974230038, 5.812222145), z_dir=(-1, 0, 0)), keep=Keep.TOP, mode=Mode.PRIVATE)
    add(chamfer1_piece_4)

    # Chamfer2: one chamfer whose edges measure the first distance from different faces: ONE call of the kernel's chamfer builder (chamfer() names one face for all edges)
    chamfer2_edges_1 = [part.edges().sort_by_distance(p)[0] for p in [
        (21.5, 55.5, 8.6),
    ]]
    chamfer2_side_1 = [part.faces().sort_by_distance(p)[0] for p in [
        (21.5, 54.878679656, 8.6),
    ]]
    chamfer2_edges_2 = [part.edges().sort_by_distance(p)[0] for p in [
        (-21.5, 55.5, 8.6),
    ]]
    chamfer2_side_2 = [part.faces().sort_by_distance(p)[0] for p in [
        (-21.5, 54.878679656, 8.6),
    ]]
    chamfer2 = BRepFilletAPI_MakeChamfer(part.part.solid().wrapped)
    for e in chamfer2_edges_1:
        chamfer2.Add(CHAMFER2_SIZE, CHAMFER2_SIZE2, e.wrapped, chamfer2_side_1[0].wrapped)  # the first distance lies on this face
    for e in chamfer2_edges_2:
        chamfer2.Add(CHAMFER2_SIZE, CHAMFER2_SIZE2, e.wrapped, chamfer2_side_2[0].wrapped)  # the first distance lies on this face
    add(Compound.cast(chamfer2.Shape()), mode=Mode.REPLACE)

    # Sketch19 → Cut-Extrude1 (cut)
    with BuildSketch(Plane.XY.offset(16.4)):
        with Locations((-21.5, 60)):
            Circle(SKETCH19_R)
        with Locations((21.5, 60)):
            Circle(SKETCH19_R)
    extrude(amount=-CUT_EXTRUDE1_DEPTH, mode=Mode.SUBTRACT)

    # Sketch18 → M3 Head Holes (cut)
    with BuildSketch(Plane(origin=(0, 0, 0), x_dir=(-1, 0, 0), z_dir=(0, 0, -1))):
        Polygon((16.496816706, 42.588982694), (19.903183294, 42.588982694), (21.606366588, 39.638982694), (19.903183294, 36.688982694), (16.496816706, 36.688982694), (14.793633412, 39.638982694), align=None)
        Polygon((19.903183294, 9.588982694), (21.606366588, 6.638982694), (19.903183294, 3.688982694), (16.496816706, 3.688982694), (14.793633412, 6.638982694), (16.496816706, 9.588982694), align=None)
        Polygon((-21.606366588, 6.638982694), (-19.903183294, 3.688982694), (-16.496816706, 3.688982694), (-14.793633412, 6.638982694), (-16.496816706, 9.588982694), (-19.903183294, 9.588982694), align=None)
        Polygon((-14.793633412, 39.638982694), (-16.496816706, 42.588982694), (-19.903183294, 42.588982694), (-21.606366588, 39.638982694), (-19.903183294, 36.688982694), (-16.496816706, 36.688982694), align=None)
    extrude(amount=-M3_HEAD_HOLES_DEPTH, mode=Mode.SUBTRACT)

    # Chamfer3
    chamfer3_edges = [part.edges().sort_by_distance(p)[0] for p in [
        (17, 60, 8.6),
        (-17, 60, 8.6),
    ]]
    chamfer(chamfer3_edges, length=CHAMFER3_SIZE - 0.0001)  # a hair under: the kernel refuses the full size


solid = part.part
